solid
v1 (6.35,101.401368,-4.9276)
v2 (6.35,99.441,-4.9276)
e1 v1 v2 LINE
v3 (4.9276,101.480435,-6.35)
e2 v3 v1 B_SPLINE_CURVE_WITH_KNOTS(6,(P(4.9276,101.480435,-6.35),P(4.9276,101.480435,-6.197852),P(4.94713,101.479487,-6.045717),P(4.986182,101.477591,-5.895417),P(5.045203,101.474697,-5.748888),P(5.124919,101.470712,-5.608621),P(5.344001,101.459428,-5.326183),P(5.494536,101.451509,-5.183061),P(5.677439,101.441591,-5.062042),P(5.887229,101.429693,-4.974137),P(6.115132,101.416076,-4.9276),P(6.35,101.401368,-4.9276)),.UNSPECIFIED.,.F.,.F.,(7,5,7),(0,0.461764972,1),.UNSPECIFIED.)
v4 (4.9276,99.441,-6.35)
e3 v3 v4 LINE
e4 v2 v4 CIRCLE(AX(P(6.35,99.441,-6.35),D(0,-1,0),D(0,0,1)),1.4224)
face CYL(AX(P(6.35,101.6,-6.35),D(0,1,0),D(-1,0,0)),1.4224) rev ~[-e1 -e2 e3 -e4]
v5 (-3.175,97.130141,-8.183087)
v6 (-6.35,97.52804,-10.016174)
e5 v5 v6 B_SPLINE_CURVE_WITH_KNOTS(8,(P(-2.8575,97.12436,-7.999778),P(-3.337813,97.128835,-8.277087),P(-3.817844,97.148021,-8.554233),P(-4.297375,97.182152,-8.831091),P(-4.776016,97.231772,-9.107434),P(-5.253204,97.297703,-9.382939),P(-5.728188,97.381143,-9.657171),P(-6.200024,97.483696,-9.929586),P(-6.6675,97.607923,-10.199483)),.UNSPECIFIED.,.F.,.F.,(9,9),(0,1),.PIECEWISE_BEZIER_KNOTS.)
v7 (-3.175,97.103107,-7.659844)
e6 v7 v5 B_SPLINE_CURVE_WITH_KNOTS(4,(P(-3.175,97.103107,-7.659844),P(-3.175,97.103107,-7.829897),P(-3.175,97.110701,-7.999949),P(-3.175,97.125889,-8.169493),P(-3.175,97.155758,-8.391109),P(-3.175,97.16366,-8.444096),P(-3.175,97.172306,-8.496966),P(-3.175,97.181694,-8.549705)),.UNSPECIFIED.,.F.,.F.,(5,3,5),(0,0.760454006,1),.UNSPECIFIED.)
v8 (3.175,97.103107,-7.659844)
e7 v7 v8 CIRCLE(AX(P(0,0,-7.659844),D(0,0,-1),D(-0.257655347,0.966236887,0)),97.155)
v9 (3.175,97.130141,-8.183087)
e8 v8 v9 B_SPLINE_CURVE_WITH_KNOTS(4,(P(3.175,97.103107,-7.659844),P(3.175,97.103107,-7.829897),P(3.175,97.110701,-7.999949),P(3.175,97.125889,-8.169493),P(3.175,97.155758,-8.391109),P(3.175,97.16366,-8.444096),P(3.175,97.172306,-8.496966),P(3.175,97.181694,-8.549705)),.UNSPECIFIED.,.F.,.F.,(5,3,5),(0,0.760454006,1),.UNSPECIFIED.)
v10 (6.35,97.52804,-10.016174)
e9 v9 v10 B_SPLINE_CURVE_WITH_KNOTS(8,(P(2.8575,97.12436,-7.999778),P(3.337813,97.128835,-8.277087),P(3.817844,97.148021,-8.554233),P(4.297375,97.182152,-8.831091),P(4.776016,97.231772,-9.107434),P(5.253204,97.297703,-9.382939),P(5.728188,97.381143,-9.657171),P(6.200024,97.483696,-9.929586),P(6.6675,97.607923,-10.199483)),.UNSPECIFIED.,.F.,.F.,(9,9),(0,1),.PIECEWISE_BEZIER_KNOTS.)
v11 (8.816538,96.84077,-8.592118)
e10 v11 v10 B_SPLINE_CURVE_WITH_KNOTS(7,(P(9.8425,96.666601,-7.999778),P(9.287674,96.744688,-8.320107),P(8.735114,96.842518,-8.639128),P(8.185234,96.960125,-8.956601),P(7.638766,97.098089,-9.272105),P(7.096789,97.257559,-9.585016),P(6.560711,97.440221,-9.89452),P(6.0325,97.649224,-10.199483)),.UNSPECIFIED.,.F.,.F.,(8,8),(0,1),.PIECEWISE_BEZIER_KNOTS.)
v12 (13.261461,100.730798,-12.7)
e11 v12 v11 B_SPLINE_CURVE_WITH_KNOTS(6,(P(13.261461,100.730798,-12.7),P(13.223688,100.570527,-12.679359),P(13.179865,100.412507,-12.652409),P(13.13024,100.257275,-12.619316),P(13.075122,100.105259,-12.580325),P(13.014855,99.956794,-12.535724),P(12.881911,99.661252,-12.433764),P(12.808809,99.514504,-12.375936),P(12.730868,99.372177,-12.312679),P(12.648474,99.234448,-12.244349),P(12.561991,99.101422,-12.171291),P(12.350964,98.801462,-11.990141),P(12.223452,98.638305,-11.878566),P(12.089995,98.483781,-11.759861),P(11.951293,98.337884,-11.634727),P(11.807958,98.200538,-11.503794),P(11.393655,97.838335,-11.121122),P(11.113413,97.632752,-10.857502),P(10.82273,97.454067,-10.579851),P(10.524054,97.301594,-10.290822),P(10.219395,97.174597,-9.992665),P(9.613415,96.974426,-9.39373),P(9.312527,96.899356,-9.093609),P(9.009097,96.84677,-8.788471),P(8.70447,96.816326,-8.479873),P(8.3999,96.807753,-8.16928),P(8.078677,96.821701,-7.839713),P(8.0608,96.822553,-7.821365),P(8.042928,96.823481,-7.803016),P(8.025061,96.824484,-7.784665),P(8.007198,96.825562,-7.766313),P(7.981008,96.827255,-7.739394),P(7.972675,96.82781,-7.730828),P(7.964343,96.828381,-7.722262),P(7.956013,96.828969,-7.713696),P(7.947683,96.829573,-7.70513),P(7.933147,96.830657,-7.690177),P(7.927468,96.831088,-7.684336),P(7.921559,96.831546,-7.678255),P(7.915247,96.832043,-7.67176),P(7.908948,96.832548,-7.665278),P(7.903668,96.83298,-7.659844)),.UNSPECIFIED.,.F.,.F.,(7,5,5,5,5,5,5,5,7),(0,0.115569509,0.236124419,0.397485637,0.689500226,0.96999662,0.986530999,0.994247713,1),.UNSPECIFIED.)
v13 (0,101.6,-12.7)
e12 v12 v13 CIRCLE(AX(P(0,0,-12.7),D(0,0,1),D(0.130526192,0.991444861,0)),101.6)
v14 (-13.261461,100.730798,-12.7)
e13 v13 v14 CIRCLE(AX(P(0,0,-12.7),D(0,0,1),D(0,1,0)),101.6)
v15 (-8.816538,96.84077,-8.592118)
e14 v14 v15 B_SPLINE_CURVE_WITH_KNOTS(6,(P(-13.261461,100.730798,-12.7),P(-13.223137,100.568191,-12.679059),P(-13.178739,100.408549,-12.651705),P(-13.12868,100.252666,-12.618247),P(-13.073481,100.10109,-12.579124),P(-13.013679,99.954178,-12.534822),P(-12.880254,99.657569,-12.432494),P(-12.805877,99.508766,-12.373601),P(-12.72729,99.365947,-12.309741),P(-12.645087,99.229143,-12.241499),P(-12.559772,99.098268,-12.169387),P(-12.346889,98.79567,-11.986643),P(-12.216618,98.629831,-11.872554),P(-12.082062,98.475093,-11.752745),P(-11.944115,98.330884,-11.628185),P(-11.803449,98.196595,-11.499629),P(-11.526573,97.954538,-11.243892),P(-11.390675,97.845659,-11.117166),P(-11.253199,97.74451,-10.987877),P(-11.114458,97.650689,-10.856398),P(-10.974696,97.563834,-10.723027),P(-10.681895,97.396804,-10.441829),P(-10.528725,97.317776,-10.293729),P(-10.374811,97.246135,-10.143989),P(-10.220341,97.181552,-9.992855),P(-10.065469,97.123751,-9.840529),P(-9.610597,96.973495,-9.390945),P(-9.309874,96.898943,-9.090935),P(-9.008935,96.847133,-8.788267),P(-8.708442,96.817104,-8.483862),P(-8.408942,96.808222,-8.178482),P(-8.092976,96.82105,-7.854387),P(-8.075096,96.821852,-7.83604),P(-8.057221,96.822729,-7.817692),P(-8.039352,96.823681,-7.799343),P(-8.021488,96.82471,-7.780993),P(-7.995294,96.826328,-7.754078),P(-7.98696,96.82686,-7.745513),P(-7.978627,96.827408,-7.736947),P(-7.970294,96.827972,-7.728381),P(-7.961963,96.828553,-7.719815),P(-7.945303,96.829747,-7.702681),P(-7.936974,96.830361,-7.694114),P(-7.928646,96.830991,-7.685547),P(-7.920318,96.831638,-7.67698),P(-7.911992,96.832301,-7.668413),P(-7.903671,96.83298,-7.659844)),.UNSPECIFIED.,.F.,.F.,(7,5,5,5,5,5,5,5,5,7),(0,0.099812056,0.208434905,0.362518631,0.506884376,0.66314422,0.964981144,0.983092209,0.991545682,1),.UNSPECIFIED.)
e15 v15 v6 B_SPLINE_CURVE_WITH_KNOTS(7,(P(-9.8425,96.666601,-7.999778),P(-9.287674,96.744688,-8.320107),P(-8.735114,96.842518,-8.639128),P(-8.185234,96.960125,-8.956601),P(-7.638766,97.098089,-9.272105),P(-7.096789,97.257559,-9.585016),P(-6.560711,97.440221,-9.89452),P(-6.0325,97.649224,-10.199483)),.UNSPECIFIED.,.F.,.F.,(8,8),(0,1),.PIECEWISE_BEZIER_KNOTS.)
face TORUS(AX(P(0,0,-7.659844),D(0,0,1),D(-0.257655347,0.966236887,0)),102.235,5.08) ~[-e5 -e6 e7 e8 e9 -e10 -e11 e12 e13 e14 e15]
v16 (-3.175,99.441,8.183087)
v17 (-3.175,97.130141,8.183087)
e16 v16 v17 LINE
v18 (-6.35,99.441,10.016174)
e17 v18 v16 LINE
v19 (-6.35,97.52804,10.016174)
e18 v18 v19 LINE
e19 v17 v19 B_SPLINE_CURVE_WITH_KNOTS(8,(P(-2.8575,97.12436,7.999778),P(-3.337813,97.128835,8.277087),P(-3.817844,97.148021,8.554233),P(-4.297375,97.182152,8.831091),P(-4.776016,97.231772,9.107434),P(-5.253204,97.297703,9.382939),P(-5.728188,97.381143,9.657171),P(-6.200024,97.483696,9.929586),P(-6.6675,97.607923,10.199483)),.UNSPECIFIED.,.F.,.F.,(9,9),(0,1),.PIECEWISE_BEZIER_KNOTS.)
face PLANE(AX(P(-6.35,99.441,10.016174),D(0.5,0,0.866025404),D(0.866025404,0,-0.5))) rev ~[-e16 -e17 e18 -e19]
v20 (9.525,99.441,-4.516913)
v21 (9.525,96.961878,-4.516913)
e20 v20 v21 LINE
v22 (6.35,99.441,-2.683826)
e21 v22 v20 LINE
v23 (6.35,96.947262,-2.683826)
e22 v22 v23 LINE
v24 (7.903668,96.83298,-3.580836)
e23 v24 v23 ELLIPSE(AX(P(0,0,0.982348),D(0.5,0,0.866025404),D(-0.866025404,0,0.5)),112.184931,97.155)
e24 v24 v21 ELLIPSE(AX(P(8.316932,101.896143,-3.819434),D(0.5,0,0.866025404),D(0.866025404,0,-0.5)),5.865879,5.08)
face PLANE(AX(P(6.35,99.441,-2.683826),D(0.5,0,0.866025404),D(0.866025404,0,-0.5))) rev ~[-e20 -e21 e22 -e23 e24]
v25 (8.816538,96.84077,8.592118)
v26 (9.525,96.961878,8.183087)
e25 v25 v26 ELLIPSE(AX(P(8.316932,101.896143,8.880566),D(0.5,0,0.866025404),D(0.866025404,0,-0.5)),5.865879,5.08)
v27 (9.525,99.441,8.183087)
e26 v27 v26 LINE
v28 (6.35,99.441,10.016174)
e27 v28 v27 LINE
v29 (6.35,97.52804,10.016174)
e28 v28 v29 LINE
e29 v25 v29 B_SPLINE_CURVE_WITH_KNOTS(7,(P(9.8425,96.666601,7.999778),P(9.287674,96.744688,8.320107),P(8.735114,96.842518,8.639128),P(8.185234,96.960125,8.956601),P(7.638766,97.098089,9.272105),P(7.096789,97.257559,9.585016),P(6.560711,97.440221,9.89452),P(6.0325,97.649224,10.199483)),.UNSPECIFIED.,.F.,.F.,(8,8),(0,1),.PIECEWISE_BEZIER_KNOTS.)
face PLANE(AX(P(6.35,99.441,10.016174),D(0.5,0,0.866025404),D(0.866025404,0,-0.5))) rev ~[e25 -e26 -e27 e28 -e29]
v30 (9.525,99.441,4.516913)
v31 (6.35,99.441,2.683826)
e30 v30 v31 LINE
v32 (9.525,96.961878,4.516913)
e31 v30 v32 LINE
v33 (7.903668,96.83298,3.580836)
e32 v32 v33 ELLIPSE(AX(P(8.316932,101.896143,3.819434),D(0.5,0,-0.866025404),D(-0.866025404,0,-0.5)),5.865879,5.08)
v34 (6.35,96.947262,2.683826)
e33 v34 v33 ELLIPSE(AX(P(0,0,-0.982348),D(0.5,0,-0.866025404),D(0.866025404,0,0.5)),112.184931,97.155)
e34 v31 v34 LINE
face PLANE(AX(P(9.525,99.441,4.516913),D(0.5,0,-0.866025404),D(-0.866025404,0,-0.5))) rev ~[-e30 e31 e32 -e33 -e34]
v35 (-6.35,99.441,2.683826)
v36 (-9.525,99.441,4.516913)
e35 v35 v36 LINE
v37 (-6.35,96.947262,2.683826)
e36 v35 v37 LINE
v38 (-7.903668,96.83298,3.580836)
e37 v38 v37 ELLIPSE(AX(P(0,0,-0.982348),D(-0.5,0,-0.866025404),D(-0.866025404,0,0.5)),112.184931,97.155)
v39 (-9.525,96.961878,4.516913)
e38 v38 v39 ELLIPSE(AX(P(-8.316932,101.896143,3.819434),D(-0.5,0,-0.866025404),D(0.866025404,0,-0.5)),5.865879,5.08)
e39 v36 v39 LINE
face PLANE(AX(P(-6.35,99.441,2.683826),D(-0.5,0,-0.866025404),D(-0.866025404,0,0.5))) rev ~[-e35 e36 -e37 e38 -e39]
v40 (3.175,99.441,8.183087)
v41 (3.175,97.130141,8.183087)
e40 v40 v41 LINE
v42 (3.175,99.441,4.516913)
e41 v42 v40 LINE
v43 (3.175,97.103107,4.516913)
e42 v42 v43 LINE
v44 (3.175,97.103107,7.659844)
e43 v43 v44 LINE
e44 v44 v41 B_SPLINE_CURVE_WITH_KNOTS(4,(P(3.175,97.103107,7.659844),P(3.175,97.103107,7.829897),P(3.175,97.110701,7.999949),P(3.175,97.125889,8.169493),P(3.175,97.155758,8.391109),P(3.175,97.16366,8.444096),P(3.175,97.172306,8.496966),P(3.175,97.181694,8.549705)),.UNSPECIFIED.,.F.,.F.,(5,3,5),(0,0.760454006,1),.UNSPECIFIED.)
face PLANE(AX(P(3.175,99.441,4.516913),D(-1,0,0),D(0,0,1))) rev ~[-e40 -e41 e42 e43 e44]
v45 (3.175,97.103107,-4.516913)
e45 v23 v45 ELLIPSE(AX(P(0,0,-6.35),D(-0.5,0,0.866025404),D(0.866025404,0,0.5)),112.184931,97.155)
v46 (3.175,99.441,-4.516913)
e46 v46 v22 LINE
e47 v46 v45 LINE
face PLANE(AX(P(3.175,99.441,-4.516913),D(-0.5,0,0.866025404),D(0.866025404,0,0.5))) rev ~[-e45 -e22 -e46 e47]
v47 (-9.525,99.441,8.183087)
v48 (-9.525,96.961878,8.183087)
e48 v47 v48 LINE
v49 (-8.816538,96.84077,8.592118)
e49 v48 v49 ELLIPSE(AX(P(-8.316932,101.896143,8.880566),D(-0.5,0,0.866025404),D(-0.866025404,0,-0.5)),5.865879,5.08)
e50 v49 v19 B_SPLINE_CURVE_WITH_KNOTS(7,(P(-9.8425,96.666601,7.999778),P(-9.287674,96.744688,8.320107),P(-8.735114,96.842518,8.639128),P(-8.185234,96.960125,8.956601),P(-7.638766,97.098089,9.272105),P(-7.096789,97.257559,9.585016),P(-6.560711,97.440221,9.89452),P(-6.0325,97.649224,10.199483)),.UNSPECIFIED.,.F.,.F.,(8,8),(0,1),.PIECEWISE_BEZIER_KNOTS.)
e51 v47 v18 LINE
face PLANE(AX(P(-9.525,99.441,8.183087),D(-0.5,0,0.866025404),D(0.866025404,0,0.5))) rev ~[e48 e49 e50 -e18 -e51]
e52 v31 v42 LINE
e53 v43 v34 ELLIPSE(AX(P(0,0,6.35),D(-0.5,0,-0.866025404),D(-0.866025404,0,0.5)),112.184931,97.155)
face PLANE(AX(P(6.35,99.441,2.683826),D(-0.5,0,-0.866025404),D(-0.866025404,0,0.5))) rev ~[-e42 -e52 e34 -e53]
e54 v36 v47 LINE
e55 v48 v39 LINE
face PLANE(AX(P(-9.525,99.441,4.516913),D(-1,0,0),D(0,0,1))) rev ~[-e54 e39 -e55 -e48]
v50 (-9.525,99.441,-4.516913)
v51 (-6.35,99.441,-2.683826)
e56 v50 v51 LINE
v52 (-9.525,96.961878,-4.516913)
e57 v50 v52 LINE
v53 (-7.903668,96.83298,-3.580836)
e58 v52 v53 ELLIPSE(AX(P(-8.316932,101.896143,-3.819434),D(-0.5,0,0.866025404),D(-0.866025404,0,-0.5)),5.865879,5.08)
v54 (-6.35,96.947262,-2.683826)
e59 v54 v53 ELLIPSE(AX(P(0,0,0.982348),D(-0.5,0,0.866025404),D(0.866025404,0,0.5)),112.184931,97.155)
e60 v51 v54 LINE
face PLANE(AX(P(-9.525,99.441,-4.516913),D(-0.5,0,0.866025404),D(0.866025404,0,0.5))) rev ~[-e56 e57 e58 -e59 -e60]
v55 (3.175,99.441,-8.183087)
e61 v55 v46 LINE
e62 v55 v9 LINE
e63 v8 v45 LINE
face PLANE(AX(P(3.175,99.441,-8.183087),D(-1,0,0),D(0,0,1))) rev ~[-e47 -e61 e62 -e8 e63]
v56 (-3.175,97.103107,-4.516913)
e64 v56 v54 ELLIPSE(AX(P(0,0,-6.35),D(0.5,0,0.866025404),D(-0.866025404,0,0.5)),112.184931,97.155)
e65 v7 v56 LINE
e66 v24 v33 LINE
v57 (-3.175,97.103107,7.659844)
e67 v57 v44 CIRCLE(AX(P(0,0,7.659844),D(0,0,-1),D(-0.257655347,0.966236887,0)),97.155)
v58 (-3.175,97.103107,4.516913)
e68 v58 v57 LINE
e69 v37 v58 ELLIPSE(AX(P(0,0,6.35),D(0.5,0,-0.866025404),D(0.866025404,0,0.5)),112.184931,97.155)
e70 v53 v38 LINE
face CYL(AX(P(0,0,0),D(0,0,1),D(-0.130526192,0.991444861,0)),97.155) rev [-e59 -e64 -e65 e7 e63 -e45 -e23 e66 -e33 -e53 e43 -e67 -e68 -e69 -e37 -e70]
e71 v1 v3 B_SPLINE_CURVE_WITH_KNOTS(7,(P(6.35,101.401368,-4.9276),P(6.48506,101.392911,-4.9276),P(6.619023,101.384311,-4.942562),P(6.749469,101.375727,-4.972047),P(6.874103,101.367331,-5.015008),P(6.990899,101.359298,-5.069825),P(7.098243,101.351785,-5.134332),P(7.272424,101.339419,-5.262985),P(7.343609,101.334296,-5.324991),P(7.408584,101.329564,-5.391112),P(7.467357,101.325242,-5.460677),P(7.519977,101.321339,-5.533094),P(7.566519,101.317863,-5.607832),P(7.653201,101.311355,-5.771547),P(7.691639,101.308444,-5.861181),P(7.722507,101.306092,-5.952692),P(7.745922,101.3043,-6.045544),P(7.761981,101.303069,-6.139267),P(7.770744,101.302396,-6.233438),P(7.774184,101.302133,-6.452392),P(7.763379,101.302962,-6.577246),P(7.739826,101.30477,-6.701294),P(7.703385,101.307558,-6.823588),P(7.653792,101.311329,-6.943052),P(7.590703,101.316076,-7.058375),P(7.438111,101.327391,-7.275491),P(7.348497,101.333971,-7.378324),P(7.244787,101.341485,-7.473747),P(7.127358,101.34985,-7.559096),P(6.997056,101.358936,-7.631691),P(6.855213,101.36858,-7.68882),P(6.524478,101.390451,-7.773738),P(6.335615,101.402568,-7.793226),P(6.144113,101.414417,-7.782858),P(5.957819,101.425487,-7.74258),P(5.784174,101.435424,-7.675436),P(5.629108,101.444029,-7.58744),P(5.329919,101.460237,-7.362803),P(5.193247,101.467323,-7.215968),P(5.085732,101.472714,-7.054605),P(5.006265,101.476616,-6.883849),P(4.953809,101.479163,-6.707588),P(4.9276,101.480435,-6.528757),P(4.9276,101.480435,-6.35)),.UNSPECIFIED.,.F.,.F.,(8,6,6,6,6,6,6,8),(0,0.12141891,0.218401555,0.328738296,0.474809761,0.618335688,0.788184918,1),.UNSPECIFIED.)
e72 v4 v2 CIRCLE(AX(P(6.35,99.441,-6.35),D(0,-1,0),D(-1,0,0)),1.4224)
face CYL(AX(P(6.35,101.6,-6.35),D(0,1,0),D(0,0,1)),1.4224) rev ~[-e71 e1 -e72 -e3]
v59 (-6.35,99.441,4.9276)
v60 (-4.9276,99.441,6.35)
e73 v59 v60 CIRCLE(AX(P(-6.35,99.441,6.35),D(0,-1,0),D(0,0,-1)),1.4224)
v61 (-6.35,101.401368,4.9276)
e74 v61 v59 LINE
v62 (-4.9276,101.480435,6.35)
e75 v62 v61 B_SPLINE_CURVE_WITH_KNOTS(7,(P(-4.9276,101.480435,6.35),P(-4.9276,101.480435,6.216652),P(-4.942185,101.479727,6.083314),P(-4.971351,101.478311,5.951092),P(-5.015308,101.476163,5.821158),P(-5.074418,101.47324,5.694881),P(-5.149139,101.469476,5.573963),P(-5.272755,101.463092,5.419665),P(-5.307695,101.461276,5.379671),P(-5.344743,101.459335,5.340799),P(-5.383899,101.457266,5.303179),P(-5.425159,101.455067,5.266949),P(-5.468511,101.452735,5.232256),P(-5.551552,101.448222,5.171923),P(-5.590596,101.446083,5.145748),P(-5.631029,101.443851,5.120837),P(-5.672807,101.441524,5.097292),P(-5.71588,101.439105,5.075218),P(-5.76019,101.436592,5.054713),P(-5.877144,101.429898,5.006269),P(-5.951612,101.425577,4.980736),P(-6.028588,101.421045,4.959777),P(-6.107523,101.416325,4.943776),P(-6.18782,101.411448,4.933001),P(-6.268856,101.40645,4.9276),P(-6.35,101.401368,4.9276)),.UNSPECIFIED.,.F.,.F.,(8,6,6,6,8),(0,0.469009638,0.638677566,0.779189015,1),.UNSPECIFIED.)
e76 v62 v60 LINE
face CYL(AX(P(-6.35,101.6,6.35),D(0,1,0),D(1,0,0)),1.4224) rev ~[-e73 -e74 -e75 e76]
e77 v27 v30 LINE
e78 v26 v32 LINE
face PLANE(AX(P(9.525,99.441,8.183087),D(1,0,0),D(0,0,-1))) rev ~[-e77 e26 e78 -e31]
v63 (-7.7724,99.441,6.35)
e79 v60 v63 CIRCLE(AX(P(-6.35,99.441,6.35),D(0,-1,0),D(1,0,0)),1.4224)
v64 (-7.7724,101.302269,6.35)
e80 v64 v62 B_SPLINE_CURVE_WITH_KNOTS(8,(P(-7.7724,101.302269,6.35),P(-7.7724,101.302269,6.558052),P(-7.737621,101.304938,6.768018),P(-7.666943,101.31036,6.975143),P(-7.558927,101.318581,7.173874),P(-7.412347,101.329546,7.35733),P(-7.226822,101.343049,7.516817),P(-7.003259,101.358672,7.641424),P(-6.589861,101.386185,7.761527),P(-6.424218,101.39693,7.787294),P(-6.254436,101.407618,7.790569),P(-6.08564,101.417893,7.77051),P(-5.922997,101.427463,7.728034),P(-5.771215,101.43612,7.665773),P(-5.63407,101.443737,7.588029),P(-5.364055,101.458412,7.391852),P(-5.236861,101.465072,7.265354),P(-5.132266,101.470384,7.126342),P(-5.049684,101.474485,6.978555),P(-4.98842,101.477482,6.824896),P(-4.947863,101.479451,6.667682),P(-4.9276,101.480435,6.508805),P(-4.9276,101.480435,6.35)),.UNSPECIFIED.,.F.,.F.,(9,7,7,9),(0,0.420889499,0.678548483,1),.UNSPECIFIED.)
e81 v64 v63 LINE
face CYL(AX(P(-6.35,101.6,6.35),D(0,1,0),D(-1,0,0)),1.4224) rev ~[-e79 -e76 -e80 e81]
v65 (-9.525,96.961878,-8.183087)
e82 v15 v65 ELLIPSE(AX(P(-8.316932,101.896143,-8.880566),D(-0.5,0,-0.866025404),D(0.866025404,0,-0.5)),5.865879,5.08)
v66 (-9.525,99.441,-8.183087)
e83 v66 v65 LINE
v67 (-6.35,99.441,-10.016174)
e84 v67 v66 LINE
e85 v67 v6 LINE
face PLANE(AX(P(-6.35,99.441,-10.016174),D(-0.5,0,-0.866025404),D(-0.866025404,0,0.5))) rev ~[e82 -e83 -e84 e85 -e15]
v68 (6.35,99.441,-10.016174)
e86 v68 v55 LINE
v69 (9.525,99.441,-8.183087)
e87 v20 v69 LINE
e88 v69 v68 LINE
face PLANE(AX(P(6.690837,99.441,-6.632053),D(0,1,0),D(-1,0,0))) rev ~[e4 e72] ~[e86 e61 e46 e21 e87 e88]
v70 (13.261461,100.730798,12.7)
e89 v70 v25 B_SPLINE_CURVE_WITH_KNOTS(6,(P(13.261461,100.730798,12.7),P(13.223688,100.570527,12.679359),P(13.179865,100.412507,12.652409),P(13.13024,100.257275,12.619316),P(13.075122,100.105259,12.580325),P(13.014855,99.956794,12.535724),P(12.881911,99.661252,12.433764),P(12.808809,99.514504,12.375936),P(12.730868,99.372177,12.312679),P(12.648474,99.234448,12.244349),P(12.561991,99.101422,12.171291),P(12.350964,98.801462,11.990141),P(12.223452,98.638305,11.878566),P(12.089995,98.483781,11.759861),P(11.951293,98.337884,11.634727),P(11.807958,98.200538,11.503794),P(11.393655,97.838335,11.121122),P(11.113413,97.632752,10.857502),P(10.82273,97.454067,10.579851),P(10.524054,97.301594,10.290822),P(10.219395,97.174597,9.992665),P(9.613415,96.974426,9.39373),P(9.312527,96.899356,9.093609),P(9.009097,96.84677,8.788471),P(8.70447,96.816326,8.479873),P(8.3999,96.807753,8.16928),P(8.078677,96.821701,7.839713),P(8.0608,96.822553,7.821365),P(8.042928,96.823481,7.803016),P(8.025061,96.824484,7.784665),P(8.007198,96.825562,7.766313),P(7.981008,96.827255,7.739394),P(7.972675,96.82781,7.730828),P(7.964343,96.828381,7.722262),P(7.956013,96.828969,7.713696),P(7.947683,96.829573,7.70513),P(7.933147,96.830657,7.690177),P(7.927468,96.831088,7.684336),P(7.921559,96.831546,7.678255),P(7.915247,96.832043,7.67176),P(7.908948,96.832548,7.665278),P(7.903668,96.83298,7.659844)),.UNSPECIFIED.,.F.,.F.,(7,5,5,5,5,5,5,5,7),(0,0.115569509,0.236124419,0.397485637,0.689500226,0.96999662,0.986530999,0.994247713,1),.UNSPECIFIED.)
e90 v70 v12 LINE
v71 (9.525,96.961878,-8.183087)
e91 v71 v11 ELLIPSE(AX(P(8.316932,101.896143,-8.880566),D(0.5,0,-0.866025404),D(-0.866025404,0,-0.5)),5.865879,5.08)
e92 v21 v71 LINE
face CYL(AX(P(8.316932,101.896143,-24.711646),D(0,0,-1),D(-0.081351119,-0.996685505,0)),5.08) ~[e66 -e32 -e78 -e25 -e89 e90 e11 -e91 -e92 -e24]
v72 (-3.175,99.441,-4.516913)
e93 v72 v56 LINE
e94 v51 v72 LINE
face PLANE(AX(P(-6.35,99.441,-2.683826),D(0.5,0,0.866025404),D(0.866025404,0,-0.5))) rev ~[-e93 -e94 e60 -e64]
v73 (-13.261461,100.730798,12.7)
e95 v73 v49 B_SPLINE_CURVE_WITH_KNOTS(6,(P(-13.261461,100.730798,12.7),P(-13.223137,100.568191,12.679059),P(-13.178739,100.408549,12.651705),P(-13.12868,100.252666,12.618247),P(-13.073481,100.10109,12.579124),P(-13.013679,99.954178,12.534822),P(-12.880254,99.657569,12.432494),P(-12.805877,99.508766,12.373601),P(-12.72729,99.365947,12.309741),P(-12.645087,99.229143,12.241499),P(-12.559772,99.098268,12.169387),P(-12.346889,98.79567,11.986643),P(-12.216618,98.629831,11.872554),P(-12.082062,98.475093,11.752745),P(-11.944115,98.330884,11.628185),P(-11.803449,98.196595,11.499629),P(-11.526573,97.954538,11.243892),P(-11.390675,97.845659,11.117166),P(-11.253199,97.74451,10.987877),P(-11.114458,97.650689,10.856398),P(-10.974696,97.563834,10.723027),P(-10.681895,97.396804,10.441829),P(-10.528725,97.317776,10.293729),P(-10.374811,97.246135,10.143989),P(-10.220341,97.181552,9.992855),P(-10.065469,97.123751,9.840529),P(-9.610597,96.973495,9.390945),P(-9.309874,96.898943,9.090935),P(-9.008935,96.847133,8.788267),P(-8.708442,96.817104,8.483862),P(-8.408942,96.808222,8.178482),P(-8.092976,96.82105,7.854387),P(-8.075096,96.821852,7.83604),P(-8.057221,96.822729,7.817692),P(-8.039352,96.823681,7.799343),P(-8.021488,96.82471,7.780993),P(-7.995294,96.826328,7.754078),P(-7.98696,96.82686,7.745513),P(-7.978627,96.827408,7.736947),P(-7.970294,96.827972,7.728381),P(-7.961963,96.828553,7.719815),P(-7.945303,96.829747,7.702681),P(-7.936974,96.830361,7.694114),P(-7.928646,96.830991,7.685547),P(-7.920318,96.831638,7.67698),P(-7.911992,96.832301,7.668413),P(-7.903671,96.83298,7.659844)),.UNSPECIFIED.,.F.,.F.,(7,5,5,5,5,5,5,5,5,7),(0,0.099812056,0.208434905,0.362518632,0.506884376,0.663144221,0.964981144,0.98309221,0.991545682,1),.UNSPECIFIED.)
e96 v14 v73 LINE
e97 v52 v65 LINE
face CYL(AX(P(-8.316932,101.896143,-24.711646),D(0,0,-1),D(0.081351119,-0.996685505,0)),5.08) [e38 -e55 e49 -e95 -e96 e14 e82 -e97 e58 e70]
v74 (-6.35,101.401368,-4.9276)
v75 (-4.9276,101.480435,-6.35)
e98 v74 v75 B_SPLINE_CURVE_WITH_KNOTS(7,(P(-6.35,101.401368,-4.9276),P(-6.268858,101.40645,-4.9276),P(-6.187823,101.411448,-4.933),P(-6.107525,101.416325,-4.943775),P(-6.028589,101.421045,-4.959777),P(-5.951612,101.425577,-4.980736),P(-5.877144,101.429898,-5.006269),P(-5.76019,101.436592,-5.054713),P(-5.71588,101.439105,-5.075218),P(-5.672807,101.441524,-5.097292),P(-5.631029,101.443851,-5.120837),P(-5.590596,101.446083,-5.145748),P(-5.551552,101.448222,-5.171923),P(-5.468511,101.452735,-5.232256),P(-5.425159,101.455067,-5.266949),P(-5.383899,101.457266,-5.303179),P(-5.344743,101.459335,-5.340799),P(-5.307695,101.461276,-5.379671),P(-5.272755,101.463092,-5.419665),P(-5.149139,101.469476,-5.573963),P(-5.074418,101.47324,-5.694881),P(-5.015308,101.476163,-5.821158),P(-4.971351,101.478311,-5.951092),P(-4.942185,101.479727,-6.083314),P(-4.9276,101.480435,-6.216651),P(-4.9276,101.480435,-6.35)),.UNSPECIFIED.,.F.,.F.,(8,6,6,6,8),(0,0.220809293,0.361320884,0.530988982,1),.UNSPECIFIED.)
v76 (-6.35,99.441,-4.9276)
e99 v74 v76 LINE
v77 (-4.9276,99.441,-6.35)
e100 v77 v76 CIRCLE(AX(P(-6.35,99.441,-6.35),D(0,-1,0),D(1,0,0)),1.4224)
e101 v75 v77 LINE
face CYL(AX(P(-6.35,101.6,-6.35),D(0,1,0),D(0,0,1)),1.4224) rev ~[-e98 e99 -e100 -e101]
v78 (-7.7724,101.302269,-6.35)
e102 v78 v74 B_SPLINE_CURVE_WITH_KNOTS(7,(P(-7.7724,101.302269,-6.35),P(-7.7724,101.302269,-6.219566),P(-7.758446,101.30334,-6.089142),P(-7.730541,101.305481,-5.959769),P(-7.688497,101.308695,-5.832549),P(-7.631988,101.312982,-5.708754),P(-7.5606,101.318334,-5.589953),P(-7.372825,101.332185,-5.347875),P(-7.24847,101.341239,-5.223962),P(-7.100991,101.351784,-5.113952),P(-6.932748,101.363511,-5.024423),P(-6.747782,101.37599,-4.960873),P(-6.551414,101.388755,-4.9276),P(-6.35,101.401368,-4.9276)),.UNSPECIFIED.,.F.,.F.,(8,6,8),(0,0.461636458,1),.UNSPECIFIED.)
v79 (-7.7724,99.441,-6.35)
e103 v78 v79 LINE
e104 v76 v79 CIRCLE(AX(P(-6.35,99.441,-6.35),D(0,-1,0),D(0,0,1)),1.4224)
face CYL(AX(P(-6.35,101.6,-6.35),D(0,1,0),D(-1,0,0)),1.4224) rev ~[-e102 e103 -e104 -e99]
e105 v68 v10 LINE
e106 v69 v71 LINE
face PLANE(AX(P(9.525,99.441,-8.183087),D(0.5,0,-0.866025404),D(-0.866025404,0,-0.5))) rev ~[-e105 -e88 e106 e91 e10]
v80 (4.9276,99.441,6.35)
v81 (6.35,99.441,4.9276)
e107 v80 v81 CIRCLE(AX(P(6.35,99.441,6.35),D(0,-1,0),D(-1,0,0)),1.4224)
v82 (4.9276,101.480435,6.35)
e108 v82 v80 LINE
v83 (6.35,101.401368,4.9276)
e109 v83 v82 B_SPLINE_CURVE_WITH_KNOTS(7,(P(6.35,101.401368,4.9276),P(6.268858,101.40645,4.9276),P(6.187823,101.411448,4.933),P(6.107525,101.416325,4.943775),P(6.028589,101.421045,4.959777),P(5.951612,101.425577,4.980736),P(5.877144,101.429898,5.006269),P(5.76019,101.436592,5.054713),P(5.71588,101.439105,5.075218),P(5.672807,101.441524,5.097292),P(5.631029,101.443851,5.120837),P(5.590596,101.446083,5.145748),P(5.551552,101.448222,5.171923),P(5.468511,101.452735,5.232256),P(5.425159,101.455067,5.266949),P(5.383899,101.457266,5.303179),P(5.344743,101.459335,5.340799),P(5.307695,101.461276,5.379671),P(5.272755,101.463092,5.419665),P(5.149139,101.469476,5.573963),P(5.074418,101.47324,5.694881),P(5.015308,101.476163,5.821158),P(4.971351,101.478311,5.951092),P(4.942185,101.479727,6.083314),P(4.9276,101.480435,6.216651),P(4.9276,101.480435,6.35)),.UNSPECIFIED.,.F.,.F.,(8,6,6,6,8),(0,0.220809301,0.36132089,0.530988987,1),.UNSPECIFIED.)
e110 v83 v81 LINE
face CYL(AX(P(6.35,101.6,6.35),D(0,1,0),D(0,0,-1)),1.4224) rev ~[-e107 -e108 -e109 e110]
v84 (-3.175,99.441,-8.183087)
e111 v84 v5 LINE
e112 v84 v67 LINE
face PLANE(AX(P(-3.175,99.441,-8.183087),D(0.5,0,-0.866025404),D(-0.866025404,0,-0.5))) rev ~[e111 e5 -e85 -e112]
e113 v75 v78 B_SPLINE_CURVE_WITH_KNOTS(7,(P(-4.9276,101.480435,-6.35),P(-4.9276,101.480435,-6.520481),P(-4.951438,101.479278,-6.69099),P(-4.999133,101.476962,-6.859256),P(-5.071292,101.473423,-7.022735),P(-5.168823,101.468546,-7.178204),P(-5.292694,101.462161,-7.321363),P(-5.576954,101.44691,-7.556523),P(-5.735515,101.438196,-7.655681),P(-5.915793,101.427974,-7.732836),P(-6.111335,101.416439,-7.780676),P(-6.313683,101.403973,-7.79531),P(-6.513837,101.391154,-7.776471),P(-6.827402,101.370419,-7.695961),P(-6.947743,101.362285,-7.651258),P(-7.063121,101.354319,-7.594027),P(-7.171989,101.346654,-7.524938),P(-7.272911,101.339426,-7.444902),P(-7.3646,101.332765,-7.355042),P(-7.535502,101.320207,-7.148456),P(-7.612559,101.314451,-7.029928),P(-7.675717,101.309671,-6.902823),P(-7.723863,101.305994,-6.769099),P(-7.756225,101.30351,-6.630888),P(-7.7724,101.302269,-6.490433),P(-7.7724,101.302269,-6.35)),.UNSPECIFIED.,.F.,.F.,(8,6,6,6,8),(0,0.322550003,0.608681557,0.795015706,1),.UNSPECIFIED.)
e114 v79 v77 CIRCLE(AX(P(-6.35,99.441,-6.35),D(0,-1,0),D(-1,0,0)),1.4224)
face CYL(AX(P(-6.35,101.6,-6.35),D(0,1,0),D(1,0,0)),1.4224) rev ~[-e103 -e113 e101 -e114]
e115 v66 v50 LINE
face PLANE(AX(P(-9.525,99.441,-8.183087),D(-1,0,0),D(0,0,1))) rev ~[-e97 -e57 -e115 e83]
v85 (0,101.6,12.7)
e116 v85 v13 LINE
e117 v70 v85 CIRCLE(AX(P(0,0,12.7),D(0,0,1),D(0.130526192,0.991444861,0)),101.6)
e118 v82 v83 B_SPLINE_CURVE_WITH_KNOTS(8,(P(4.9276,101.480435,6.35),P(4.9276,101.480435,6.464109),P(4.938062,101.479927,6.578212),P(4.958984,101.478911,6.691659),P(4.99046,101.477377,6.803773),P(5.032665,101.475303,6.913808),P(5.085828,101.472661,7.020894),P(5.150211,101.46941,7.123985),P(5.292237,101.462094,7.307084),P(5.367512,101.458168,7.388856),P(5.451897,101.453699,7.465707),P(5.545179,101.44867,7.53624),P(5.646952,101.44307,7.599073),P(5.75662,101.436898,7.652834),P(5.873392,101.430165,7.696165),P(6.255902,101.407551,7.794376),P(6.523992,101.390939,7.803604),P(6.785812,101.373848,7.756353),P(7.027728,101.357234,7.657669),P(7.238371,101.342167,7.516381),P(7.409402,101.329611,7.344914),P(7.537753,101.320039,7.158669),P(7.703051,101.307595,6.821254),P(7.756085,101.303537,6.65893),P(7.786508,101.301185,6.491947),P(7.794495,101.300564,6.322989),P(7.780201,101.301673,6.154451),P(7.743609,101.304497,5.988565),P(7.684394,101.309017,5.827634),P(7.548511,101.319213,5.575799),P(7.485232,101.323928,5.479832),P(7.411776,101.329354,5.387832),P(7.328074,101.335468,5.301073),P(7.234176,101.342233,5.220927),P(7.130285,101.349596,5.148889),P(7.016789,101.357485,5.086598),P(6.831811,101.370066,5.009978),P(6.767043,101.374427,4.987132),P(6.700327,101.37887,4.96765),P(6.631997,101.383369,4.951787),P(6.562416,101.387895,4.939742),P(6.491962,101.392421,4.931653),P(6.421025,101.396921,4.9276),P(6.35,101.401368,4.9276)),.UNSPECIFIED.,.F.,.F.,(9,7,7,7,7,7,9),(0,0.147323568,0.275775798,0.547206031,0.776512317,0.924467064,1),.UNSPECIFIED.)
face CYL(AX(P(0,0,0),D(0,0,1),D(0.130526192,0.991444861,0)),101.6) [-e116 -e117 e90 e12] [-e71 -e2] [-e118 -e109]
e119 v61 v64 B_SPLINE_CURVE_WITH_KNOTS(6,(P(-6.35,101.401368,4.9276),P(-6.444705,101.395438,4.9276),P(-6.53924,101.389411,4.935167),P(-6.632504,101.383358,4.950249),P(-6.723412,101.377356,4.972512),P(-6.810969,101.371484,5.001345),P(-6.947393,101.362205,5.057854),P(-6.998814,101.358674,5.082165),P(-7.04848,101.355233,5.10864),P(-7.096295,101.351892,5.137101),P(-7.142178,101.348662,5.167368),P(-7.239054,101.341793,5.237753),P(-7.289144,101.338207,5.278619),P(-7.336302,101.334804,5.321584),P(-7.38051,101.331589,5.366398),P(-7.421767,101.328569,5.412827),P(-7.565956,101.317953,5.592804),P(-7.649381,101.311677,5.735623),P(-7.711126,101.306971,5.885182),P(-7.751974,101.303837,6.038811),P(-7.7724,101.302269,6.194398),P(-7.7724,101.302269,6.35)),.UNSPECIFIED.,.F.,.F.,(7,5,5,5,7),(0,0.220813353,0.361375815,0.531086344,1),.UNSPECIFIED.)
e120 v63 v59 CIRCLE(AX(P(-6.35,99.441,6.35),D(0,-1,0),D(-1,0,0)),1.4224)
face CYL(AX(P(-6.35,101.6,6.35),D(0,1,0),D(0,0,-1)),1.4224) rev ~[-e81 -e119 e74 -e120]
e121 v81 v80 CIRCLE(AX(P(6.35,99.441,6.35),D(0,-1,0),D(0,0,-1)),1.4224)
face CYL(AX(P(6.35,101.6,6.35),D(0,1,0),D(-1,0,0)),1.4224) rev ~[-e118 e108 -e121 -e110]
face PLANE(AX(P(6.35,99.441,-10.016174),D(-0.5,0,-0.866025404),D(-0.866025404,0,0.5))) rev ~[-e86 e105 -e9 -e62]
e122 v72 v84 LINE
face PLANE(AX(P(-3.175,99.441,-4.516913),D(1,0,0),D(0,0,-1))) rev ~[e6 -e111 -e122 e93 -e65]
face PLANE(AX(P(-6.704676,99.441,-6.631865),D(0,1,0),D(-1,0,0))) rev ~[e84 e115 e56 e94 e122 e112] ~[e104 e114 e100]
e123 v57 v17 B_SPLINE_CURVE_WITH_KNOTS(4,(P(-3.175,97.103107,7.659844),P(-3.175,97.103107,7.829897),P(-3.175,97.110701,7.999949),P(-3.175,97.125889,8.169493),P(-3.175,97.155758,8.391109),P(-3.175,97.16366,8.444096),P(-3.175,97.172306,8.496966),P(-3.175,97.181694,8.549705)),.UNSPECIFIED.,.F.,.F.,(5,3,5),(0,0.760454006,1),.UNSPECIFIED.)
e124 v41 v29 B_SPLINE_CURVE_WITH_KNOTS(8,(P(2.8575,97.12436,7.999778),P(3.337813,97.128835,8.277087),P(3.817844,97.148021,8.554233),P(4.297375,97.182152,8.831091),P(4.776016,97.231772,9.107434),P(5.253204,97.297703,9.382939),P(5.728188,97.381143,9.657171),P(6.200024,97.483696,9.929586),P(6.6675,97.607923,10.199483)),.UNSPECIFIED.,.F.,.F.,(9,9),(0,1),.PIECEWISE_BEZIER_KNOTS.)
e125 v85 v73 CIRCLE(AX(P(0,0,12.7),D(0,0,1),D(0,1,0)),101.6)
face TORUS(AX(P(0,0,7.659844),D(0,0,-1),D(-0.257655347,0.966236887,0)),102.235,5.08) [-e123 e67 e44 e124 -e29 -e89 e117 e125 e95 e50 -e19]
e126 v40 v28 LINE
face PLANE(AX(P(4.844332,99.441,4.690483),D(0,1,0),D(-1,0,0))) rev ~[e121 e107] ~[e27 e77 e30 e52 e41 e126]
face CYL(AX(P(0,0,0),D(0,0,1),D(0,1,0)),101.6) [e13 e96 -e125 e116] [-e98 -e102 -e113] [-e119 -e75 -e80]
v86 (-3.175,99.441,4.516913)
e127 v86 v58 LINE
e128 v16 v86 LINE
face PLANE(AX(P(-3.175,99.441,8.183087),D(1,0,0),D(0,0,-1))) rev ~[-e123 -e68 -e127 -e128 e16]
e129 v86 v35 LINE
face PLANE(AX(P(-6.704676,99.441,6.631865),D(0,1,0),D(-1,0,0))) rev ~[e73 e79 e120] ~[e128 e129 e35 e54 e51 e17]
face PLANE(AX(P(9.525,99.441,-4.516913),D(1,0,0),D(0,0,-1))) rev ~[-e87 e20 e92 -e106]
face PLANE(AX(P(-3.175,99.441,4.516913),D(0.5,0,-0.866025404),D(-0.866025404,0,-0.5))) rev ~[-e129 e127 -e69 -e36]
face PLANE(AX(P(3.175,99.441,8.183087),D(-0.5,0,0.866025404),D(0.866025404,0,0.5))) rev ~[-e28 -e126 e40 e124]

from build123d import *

# Parameters (mm, degrees)
F1_DEPTH    = 12.7
F6_DEPTH    = 25.4
F7_T1_DEPTH = 49.4232912098
F7_T4_ANGLE = 29.8619681209
F7_T6_ANGLE = 29.8619681209
F8_START    = -2.159
F8_DEPTH    = 23.241
F9_DEPTH    = 25.4


# Not quite as in the source:
# - a fillet or chamfer that OpenCascade refuses, or shapes differently, is made with other operations: its cross-section is extruded or revolved along the edge and cut away or added


with BuildPart() as f1:
    # F0 (on Top) → F1 (new body, symmetric)
    with BuildSketch(Plane.XY):
        with BuildLine():
            ThreePointArc((0, 101.6), (-6.6449579298, 101.382466601), (-13.2614611296, 100.7307979156))
            Line((-13.2614611296, 100.7307979156), (-12.6812722051, 96.3238255068))
            ThreePointArc((-12.6812722051, 96.3238255068), (-6.3542410204, 96.9469836872), (0, 97.155))
            Line((0, 97.155), (0, 101.6))
        make_face()
        with BuildLine():
            Line((12.6812722051, 96.3238255068), (13.2614611296, 100.7307979156))
            ThreePointArc((13.2614611296, 100.7307979156), (6.6449579298, 101.382466601), (0, 101.6))
            Line((0, 101.6), (0, 97.155))
            ThreePointArc((0, 97.155), (6.3542410204, 96.9469836872), (12.6812722051, 96.3238255068))
        make_face()
    extrude(amount=F1_DEPTH, both=True)

    # F5 (on line) → F6 (cut)
    with BuildSketch(Plane(origin=(0, 101.6, 0), x_dir=(-1, 0, 0), z_dir=(0, 1, 0))):
        with BuildLine():
            Line((6.35, -6.35), (4.9276, -6.35))
            ThreePointArc((4.9276, -6.35), (6.35, -7.7724), (7.7724, -6.35))
            ThreePointArc((7.7724, -6.35), (7.3557886856, -5.3442113144), (6.35, -4.9276))
            Line((6.35, -4.9276), (6.35, -6.35))
        make_face()
        with BuildLine():
            ThreePointArc((6.35, -4.9276), (5.3442113144, -5.3442113144), (4.9276, -6.35))
            Line((4.9276, -6.35), (6.35, -6.35))
            Line((6.35, -6.35), (6.35, -4.9276))
        make_face()
        with BuildLine():
            Line((-4.9276, -6.35), (-6.35, -6.35))
            Line((-6.35, -6.35), (-6.35, -4.9276))
            ThreePointArc((-6.35, -4.9276), (-7.3557886856, -7.3557886856), (-4.9276, -6.35))
        make_face()
        with BuildLine():
            Line((-6.35, -4.9276), (-6.35, -6.35))
            Line((-6.35, -6.35), (-4.9276, -6.35))
            ThreePointArc((-4.9276, -6.35), (-5.3442113144, -5.3442113144), (-6.35, -4.9276))
        make_face()
        with BuildLine():
            Line((6.35, 6.35), (6.35, 4.9276))
            ThreePointArc((6.35, 4.9276), (7.3557886856, 5.3442113144), (7.7724, 6.35))
            ThreePointArc((7.7724, 6.35), (6.35, 7.7724), (4.9276, 6.35))
            Line((4.9276, 6.35), (6.35, 6.35))
        make_face()
        with BuildLine():
            ThreePointArc((4.9276, 6.35), (5.3442113144, 5.3442113144), (6.35, 4.9276))
            Line((6.35, 4.9276), (6.35, 6.35))
            Line((6.35, 6.35), (4.9276, 6.35))
        make_face()
        with BuildLine():
            ThreePointArc((-4.9276, 6.35), (-7.3557886856, 7.3557886856), (-6.35, 4.9276))
            Line((-6.35, 4.9276), (-6.35, 6.35))
            Line((-6.35, 6.35), (-4.9276, 6.35))
        make_face()
        with BuildLine():
            Line((-6.35, 6.35), (-6.35, 4.9276))
            ThreePointArc((-6.35, 4.9276), (-5.3442113144, 5.3442113144), (-4.9276, 6.35))
            Line((-4.9276, 6.35), (-6.35, 6.35))
        make_face()
    extrude(amount=-F6_DEPTH, mode=Mode.SUBTRACT)

    # F7: fillet of radius 5.08 on 4 edges, made by hand

    # F7_s2 → F7_t1 (cut)
    with BuildSketch(Plane.XY.offset(-24.7116456049)):
        with BuildLine():
            ThreePointArc((7.9036679621, 96.8329802172), (11.3054660928, 97.7882158705), (13.2614611296, 100.7307979156))
            Line((13.2614611296, 100.7307979156), (12.6812722051, 96.3238255068))
            ThreePointArc((12.6812722051, 96.3238255068), (10.2956180024, 96.6079410553), (7.9036679621, 96.8329802172))
        make_face()
        with BuildLine():
            ThreePointArc((-7.9036679621, 96.8329802172), (-11.3054660928, 97.7882158705), (-13.2614611296, 100.7307979156))
            Line((-13.2614611296, 100.7307979156), (-12.6812722051, 96.3238255068))
            ThreePointArc((-12.6812722051, 96.3238255068), (-10.2956180024, 96.6079410553), (-7.9036679621, 96.8329802172))
        make_face()
    extrude(amount=F7_T1_DEPTH, mode=Mode.SUBTRACT)

    # F7_s3 → F7_t4 (revolve, cut)
    with BuildSketch(Plane(origin=(0, 0, 0), x_dir=(0, 0, 1), z_dir=(-0.9662368873, -0.2576553465, 0))):
        with BuildLine():
            ThreePointArc((7.6598437524, 97.155), (11.0199479175, 98.425), (12.7, 101.6))
            Line((12.7, 101.6), (12.7, 97.155))
            Line((12.7, 97.155), (7.6598437524, 97.155))
        make_face()
    revolve(axis=Axis((0, 0, 12.7), (0, 0, -1)), revolution_arc=F7_T4_ANGLE, mode=Mode.SUBTRACT)

    # F7_s5 → F7_t6 (revolve, cut)
    with BuildSketch(Plane(origin=(0, 0, 0), x_dir=(0, 0, 1), z_dir=(-0.9662368873, -0.2576553465, 0))):
        with BuildLine():
            ThreePointArc((-7.6598437524, 97.155), (-11.0199479175, 98.425), (-12.7, 101.6))
            Line((-12.7, 101.6), (-12.7, 97.155))
            Line((-12.7, 97.155), (-7.6598437524, 97.155))
        make_face()
    revolve(axis=Axis((0, 0, -12.7), (0, 0, -1)), revolution_arc=F7_T6_ANGLE, mode=Mode.SUBTRACT)

    # F5 (on line) → F8 (cut)
    with BuildSketch(Plane(origin=(0, 101.6, 0), x_dir=(-1, 0, 0), z_dir=(0, 1, 0)).offset(F8_START)):
        with BuildLine():
            Line((6.35, 4.9276), (6.35, 2.6838257906))
            Line((6.35, 2.6838257906), (9.525, 4.5169128953))
            Line((9.525, 4.5169128953), (9.525, 8.1830871047))
            Line((9.525, 8.1830871047), (6.35, 10.0161742094))
            Line((6.35, 10.0161742094), (3.175, 8.1830871047))
            Line((3.175, 8.1830871047), (3.175, 6.35))
            Line((3.175, 6.35), (4.9276, 6.35))
            ThreePointArc((4.9276, 6.35), (6.35, 7.7724), (7.7724, 6.35))
            ThreePointArc((7.7724, 6.35), (7.3557886856, 5.3442113144), (6.35, 4.9276))
        make_face()
        with BuildLine():
            Line((3.175, 4.5169128953), (6.35, 2.6838257906))
            Line((6.35, 2.6838257906), (6.35, 4.9276))
            ThreePointArc((6.35, 4.9276), (5.3442113144, 5.3442113144), (4.9276, 6.35))
            Line((4.9276, 6.35), (3.175, 6.35))
            Line((3.175, 6.35), (3.175, 4.5169128953))
        make_face()
        with BuildLine():
            Line((4.9276, -6.35), (3.175, -6.35))
            Line((3.175, -6.35), (3.175, -8.1830871047))
            Line((3.175, -8.1830871047), (6.35, -10.0161742094))
            Line((6.35, -10.0161742094), (9.525, -8.1830871047))
            Line((9.525, -8.1830871047), (9.525, -4.5169128953))
            Line((9.525, -4.5169128953), (6.35, -2.6838257906))
            Line((6.35, -2.6838257906), (6.35, -4.9276))
            ThreePointArc((6.35, -4.9276), (7.3557886856, -5.3442113144), (7.7724, -6.35))
            ThreePointArc((7.7724, -6.35), (6.35, -7.7724), (4.9276, -6.35))
        make_face()
        with BuildLine():
            Line((3.175, -4.5169128953), (3.175, -6.35))
            Line((3.175, -6.35), (4.9276, -6.35))
            ThreePointArc((4.9276, -6.35), (5.3442113144, -5.3442113144), (6.35, -4.9276))
            Line((6.35, -4.9276), (6.35, -2.6838257906))
            Line((6.35, -2.6838257906), (3.175, -4.5169128953))
        make_face()
        with BuildLine():
            Line((-3.175, -6.35), (-4.9276, -6.35))
            ThreePointArc((-4.9276, -6.35), (-7.3557886856, -7.3557886856), (-6.35, -4.9276))
            Line((-6.35, -4.9276), (-6.35, -2.6838257906))
            Line((-6.35, -2.6838257906), (-9.525, -4.5169128953))
            Line((-9.525, -4.5169128953), (-9.525, -8.1830871047))
            Line((-9.525, -8.1830871047), (-6.35, -10.0161742094))
            Line((-6.35, -10.0161742094), (-3.175, -8.1830871047))
            Line((-3.175, -8.1830871047), (-3.175, -6.35))
        make_face()
        with BuildLine():
            ThreePointArc((-6.35, -4.9276), (-5.3442113144, -5.3442113144), (-4.9276, -6.35))
            Line((-4.9276, -6.35), (-3.175, -6.35))
            Line((-3.175, -6.35), (-3.175, -4.5169128953))
            Line((-3.175, -4.5169128953), (-6.35, -2.6838257906))
            Line((-6.35, -2.6838257906), (-6.35, -4.9276))
        make_face()
        with BuildLine():
            Line((-6.35, 4.9276), (-6.35, 2.6838257906))
            Line((-6.35, 2.6838257906), (-3.175, 4.5169128953))
            Line((-3.175, 4.5169128953), (-3.175, 6.35))
            Line((-3.175, 6.35), (-4.9276, 6.35))
            ThreePointArc((-4.9276, 6.35), (-5.3442113144, 5.3442113144), (-6.35, 4.9276))
        make_face()
        with BuildLine():
            Line((-9.525, 4.5169128953), (-6.35, 2.6838257906))
            Line((-6.35, 2.6838257906), (-6.35, 4.9276))
            ThreePointArc((-6.35, 4.9276), (-7.3557886856, 7.3557886856), (-4.9276, 6.35))
            Line((-4.9276, 6.35), (-3.175, 6.35))
            Line((-3.175, 6.35), (-3.175, 8.1830871047))
            Line((-3.175, 8.1830871047), (-6.35, 10.0161742094))
            Line((-6.35, 10.0161742094), (-9.525, 8.1830871047))
            Line((-9.525, 8.1830871047), (-9.525, 4.5169128953))
        make_face()
    extrude(amount=-F8_DEPTH, mode=Mode.SUBTRACT)

    # F5 (on line) → F9 (cut)
    with BuildSketch(Plane(origin=(0, 101.6, 0), x_dir=(-1, 0, 0), z_dir=(0, 1, 0))):
        with BuildLine():
            ThreePointArc((-4.9276, 6.35), (-7.3557886856, 7.3557886856), (-6.35, 4.9276))
            Line((-6.35, 4.9276), (-6.35, 6.35))
            Line((-6.35, 6.35), (-4.9276, 6.35))
        make_face()
        with BuildLine():
            Line((-6.35, 6.35), (-6.35, 4.9276))
            ThreePointArc((-6.35, 4.9276), (-5.3442113144, 5.3442113144), (-4.9276, 6.35))
            Line((-4.9276, 6.35), (-6.35, 6.35))
        make_face()
    extrude(amount=-F9_DEPTH, mode=Mode.SUBTRACT)


solid = f1.part
